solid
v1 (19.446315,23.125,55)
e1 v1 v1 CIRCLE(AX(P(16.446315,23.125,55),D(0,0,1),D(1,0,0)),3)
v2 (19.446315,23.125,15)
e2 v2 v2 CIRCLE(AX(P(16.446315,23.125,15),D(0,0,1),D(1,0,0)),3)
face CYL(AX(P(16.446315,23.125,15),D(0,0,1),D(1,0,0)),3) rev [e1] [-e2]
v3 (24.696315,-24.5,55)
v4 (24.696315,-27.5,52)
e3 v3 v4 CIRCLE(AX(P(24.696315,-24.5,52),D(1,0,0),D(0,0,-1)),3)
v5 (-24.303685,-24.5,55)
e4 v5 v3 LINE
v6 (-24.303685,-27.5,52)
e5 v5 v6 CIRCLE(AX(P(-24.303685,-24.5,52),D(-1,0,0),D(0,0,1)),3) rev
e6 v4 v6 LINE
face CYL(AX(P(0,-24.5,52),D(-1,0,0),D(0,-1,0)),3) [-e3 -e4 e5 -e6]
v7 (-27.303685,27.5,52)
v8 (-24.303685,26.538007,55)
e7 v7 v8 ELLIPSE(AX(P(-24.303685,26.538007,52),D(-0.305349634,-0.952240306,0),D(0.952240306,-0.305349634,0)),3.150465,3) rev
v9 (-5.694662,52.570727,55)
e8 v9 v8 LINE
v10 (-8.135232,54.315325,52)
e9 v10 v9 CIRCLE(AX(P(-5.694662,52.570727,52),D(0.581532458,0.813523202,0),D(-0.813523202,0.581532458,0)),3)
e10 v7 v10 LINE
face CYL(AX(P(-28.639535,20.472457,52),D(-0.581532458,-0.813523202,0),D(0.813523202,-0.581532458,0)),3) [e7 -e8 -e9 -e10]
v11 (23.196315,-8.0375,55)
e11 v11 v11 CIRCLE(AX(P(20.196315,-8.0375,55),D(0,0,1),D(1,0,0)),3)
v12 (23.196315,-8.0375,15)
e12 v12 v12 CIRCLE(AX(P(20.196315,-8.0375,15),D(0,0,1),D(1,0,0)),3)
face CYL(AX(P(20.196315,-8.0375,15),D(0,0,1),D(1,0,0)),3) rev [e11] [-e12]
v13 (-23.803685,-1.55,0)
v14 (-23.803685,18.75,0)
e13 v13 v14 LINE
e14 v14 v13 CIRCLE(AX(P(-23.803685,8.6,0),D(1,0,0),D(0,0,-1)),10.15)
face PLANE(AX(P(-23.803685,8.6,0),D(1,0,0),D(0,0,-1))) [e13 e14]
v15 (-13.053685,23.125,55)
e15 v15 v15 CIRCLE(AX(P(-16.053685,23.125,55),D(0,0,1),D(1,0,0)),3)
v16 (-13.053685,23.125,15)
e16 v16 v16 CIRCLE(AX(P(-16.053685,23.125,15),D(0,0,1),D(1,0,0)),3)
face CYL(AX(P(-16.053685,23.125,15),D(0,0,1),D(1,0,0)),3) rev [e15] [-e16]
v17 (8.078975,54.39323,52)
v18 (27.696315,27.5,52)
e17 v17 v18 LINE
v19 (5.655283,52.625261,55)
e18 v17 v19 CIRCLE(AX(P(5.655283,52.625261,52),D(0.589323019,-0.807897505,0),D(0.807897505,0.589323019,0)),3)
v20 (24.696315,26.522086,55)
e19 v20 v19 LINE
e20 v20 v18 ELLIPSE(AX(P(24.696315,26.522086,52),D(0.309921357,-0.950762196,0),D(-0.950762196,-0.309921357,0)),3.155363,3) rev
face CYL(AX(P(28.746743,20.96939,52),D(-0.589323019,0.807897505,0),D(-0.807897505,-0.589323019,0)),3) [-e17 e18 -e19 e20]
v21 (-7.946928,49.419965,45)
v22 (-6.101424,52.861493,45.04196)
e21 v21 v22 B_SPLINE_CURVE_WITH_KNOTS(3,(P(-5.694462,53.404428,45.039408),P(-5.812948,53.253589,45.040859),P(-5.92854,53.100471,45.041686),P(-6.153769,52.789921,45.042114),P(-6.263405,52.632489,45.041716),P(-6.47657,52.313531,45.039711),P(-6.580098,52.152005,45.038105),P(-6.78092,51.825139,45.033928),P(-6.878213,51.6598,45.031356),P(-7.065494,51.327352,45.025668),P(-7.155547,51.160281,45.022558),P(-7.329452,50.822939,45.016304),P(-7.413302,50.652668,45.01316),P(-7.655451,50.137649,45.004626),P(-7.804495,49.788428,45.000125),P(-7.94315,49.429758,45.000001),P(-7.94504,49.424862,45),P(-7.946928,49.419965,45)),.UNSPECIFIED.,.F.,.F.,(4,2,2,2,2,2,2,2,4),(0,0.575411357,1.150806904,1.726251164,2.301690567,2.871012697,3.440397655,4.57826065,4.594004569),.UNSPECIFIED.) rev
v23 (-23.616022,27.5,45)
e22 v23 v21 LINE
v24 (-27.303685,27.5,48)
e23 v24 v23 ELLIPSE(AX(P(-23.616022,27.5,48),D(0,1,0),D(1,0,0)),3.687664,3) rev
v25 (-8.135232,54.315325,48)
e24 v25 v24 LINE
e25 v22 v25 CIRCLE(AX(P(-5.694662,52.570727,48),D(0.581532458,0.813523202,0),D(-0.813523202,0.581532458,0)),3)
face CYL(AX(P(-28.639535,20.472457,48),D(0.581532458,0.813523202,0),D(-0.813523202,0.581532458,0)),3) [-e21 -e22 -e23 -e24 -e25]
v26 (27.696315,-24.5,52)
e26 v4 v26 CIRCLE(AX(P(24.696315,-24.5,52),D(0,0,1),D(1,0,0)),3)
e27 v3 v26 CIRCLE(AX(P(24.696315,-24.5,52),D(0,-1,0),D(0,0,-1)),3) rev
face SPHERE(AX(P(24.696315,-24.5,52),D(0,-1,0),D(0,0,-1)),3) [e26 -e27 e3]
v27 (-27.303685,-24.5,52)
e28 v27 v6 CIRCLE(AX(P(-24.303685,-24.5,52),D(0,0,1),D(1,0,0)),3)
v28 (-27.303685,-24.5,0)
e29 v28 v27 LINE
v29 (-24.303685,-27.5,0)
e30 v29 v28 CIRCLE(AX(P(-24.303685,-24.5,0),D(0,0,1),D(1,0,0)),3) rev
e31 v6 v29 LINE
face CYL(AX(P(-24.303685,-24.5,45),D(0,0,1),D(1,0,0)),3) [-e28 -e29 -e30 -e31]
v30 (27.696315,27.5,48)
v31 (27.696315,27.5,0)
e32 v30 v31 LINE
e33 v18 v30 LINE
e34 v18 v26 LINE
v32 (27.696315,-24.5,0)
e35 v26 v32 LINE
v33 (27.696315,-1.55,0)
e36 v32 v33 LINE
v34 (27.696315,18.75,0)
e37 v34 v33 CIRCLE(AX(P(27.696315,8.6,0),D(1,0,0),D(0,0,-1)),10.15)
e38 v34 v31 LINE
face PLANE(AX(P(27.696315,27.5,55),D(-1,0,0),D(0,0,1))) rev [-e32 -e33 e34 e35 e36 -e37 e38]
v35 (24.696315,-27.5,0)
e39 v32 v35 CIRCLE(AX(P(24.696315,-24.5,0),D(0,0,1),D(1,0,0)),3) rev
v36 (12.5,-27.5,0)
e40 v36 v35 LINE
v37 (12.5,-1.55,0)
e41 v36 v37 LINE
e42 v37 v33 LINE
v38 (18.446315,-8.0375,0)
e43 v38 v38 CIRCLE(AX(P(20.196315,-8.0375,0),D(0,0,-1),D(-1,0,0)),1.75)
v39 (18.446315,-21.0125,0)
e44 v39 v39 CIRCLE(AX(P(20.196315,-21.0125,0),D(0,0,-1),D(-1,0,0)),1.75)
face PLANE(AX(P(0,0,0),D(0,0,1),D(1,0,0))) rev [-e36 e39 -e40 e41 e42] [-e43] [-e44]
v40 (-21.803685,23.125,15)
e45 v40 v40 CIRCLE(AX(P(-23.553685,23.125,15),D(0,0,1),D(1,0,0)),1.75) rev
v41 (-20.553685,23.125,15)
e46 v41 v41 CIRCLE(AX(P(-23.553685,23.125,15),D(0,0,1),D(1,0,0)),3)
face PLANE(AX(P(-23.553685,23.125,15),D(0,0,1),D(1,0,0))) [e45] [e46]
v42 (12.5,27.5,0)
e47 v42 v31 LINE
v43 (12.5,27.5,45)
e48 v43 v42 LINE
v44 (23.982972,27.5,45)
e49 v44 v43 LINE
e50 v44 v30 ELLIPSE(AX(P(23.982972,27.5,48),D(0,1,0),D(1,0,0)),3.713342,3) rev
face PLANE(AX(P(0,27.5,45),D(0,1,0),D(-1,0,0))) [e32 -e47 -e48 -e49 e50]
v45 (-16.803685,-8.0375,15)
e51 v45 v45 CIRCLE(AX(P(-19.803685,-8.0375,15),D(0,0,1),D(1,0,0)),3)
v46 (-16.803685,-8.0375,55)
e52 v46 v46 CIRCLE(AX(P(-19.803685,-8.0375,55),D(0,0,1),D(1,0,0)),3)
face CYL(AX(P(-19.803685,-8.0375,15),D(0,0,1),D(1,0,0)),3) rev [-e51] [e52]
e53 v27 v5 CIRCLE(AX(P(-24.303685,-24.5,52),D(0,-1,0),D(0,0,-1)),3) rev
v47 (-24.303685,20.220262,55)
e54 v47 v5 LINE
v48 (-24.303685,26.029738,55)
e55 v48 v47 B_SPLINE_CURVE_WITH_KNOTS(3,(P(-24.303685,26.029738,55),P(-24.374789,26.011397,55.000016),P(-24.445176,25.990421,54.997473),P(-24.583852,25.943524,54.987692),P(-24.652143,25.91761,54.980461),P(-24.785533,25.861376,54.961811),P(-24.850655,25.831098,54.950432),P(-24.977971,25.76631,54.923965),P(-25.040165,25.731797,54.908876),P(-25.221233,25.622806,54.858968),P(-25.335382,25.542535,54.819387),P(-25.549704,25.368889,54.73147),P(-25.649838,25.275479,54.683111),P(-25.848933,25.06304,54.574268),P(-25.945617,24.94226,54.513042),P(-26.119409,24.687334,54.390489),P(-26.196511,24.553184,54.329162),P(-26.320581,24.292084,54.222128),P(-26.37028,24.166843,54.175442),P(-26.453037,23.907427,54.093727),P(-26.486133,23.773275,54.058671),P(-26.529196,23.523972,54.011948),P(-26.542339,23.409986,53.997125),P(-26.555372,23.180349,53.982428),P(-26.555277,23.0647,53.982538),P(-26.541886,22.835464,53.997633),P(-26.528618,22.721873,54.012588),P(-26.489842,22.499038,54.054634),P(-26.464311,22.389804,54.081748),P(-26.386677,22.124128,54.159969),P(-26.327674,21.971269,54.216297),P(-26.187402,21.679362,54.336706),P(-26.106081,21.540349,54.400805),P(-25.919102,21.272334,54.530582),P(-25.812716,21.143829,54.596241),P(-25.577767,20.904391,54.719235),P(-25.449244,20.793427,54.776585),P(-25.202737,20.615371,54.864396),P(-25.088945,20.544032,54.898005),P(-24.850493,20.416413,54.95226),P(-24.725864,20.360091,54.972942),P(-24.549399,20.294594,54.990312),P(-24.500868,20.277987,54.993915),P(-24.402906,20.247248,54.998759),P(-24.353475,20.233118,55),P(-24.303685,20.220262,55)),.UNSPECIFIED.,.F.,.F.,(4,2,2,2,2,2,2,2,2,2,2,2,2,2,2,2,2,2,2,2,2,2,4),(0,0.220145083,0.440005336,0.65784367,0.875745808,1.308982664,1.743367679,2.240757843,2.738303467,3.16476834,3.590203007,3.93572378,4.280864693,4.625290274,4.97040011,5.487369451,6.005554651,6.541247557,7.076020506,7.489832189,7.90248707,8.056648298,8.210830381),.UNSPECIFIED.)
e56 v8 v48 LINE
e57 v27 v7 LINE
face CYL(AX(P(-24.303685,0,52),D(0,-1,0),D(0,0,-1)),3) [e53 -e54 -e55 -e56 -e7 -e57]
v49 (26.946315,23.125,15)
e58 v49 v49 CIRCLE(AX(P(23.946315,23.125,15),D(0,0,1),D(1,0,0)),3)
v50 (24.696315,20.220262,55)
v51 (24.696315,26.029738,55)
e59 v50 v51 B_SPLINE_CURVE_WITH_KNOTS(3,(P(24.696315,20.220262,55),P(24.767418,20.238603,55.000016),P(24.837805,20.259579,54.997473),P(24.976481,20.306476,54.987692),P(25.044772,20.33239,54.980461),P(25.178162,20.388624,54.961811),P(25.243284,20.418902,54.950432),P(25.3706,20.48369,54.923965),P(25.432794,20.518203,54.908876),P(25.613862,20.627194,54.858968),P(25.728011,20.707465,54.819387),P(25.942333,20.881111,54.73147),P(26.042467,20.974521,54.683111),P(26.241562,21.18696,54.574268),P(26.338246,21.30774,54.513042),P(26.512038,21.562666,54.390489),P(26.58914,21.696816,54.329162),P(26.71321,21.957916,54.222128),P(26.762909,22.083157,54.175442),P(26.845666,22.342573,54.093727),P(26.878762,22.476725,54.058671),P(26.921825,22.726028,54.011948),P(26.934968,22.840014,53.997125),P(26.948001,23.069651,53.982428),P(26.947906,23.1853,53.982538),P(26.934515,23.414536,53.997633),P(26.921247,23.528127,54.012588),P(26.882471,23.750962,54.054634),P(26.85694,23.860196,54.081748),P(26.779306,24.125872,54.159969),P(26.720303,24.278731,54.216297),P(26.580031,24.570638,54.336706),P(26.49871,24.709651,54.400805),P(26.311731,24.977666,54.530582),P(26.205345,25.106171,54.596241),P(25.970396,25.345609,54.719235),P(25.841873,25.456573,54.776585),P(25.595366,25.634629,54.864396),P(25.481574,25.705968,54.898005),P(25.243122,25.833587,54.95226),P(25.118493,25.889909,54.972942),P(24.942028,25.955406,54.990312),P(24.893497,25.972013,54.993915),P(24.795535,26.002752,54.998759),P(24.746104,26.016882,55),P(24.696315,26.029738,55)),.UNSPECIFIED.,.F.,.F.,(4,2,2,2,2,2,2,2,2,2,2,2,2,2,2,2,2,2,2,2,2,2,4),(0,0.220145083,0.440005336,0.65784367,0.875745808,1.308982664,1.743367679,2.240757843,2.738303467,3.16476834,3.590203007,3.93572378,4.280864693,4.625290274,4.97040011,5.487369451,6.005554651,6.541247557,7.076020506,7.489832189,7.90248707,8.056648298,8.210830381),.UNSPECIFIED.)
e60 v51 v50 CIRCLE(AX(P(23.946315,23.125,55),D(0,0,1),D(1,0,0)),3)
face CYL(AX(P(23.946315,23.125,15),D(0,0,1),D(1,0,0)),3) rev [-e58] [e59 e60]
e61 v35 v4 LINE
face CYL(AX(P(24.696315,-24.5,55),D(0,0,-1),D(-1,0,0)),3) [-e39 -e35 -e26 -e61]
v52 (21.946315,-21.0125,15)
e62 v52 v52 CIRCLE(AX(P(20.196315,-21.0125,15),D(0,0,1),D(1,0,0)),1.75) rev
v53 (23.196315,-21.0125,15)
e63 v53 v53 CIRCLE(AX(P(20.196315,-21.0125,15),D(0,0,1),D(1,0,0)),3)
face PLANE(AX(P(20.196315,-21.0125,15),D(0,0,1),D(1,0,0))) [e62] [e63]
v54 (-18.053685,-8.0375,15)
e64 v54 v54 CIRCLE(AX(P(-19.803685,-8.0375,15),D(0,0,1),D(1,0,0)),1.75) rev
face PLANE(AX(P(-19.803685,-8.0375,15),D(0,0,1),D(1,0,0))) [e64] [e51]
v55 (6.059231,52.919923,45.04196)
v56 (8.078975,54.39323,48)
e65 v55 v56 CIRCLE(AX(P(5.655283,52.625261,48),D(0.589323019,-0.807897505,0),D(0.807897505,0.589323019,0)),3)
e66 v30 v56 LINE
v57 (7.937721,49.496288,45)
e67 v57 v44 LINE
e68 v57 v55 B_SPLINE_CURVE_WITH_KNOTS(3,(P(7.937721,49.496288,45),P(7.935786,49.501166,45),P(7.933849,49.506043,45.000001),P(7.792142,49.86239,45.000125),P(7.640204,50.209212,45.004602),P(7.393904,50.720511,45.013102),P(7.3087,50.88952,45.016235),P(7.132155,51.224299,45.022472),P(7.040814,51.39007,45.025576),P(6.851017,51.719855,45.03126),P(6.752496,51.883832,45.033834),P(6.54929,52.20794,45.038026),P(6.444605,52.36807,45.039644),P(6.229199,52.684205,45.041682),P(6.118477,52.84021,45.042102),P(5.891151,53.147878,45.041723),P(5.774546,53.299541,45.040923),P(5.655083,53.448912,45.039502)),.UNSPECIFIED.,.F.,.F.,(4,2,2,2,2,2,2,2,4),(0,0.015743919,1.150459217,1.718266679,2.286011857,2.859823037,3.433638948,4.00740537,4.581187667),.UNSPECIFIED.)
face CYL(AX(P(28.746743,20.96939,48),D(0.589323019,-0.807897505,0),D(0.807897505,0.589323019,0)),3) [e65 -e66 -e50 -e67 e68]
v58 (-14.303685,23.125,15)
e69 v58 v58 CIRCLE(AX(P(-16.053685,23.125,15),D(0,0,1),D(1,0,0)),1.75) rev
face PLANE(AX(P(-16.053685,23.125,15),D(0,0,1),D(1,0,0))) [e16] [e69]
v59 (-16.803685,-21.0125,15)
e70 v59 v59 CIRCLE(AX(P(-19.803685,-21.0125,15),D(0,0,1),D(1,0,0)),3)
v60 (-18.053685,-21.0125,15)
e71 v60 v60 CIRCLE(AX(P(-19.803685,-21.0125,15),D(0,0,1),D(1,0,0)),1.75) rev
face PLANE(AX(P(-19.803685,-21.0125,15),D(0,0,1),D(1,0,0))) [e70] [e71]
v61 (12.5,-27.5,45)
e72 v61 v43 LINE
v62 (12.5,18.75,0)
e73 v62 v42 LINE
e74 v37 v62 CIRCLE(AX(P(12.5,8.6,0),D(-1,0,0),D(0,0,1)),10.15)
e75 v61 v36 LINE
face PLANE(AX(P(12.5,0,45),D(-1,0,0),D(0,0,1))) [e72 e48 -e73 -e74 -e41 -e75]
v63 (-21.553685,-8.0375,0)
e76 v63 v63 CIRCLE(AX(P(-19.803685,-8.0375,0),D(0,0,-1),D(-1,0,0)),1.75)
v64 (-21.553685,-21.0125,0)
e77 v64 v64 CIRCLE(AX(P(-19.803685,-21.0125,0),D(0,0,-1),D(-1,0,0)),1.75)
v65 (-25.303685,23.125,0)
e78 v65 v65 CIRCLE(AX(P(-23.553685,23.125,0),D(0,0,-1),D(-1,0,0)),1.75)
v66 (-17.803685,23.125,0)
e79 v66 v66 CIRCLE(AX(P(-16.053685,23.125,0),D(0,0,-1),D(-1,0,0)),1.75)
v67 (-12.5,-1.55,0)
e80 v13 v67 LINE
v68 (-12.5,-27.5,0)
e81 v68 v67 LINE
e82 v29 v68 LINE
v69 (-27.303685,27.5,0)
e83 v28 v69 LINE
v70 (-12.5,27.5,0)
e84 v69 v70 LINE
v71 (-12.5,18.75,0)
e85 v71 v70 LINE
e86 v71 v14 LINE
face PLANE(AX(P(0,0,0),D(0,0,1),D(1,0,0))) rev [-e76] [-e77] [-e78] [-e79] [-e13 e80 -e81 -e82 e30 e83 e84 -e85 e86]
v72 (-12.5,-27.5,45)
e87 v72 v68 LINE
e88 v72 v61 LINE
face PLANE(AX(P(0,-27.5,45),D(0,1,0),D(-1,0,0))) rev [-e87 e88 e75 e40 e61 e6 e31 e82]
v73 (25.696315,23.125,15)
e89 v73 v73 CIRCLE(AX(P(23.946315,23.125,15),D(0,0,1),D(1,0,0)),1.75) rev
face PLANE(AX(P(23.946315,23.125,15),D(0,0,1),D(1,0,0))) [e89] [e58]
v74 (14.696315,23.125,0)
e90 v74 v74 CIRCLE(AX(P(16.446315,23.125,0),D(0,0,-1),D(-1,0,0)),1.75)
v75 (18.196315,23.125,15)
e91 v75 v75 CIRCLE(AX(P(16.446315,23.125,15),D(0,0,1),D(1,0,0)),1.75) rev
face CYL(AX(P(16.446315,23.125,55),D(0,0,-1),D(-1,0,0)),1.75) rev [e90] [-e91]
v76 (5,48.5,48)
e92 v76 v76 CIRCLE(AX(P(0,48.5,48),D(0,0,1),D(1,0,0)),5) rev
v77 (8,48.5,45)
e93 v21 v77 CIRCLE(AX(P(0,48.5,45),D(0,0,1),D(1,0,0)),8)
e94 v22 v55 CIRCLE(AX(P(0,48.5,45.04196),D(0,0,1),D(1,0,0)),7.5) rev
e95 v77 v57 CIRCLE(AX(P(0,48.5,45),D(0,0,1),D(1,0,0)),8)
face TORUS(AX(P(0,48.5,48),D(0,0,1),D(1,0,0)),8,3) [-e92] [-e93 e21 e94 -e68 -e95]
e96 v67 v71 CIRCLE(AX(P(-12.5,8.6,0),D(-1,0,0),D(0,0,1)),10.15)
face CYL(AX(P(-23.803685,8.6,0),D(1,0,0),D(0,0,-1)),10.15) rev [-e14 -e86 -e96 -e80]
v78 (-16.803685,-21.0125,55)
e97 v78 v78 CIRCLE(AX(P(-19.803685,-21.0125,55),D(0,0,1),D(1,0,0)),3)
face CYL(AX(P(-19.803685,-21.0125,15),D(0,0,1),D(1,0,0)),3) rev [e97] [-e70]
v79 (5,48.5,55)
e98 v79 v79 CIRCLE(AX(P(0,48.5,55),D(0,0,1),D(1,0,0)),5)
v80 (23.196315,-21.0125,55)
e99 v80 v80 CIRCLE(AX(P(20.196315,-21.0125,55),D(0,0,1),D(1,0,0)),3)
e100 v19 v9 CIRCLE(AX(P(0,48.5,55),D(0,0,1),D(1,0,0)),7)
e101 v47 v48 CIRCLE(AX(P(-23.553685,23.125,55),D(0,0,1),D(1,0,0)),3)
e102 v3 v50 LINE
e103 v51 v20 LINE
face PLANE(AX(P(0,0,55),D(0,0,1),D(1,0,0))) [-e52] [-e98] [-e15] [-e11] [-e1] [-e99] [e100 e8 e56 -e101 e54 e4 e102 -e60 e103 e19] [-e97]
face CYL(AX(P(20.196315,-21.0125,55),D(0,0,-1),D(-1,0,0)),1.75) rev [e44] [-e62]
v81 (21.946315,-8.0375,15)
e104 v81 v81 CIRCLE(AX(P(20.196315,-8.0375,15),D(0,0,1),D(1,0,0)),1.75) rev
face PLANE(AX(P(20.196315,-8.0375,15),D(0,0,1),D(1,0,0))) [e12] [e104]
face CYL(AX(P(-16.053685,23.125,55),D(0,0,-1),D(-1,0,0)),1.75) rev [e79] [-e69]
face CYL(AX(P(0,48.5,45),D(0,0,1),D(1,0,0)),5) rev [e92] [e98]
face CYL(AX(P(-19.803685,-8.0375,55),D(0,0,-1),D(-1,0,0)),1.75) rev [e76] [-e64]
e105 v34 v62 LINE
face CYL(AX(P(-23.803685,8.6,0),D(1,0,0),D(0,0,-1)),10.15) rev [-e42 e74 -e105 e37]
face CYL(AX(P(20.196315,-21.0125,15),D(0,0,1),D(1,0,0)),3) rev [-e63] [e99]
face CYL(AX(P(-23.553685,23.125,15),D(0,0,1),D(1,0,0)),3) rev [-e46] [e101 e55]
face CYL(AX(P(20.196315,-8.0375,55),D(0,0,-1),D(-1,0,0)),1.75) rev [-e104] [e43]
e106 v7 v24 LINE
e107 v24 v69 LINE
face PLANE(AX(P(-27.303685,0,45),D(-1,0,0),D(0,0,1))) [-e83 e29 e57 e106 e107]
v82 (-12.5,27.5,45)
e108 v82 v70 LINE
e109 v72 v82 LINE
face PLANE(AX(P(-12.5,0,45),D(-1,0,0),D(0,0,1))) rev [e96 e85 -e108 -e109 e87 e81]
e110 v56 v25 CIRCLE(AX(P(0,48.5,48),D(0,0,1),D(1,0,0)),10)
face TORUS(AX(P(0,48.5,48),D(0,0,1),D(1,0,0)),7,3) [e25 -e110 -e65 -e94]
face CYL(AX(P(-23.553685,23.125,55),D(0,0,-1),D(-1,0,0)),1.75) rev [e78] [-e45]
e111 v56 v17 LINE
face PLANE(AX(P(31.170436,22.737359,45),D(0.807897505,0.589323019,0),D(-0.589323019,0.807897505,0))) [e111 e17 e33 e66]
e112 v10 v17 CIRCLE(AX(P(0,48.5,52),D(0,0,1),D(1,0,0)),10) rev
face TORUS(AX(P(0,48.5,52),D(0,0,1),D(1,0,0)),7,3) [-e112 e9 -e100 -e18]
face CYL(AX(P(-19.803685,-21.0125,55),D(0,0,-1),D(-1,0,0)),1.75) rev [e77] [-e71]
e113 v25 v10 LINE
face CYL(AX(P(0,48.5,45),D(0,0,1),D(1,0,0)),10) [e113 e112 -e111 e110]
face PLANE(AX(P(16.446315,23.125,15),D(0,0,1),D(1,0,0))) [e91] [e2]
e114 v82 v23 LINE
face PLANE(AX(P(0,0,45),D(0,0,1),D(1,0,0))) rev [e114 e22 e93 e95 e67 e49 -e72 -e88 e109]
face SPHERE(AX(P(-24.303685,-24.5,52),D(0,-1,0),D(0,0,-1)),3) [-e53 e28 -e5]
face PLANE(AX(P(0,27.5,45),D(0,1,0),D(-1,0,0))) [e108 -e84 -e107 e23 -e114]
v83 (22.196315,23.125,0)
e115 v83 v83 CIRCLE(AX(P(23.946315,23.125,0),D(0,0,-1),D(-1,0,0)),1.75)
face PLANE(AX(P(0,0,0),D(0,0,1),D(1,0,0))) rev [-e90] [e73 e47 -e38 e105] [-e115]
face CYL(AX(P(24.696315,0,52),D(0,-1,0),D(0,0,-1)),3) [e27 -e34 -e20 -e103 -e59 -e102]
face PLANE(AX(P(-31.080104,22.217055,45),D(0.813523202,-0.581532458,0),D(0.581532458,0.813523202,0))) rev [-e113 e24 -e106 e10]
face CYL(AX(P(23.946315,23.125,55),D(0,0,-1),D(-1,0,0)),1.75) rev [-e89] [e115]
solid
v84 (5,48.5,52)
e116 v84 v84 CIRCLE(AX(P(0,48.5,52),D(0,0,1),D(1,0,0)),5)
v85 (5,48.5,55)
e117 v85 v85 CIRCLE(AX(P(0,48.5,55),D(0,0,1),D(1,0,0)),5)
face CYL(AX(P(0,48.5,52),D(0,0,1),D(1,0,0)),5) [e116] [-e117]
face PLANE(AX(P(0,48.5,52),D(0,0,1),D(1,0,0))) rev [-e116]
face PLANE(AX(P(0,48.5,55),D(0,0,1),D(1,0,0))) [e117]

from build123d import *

# Parameters (mm, degrees)
SKETCH1_W             = 55
SKETCH1_H             = 14.803685478
BOSS_EXTRUDE1_DEPTH   = 45
SKETCH1_H_2           = 15.196314522
BOSS_EXTRUDE1_2_DEPTH = 45
SKETCH2_W             = 55
SKETCH2_H             = 55
BOSS_EXTRUDE2_DEPTH   = 10
SKETCH3_R             = 5
BOSS_EXTRUDE3_DEPTH   = 10
SKETCH4_R             = 5
BOSS_EXTRUDE4_DEPTH   = 3
SKETCH5_R             = 10.15
CUT_EXTRUDE1_DEPTH    = 51.5
SKETCH8_R             = 1.75
CUT_EXTRUDE3_DEPTH    = 85.937246471
SKETCH9_R             = 3
CUT_EXTRUDE4_DEPTH    = 40
FILLET2_R             = 3


with BuildPart() as part:
    # Sketch1 → Boss-Extrude1 (new body)
    with BuildSketch(Plane(origin=(0, 0, 0), x_dir=(0, 1, 0), z_dir=(0, 0, 1))):
        with Locations((0, 19.901842739)):
            Rectangle(SKETCH1_W, SKETCH1_H)
    extrude(amount=BOSS_EXTRUDE1_DEPTH)



with BuildPart() as body_2:
    # Sketch1 → Boss-Extrude1 2 (new body)
    with BuildSketch(Plane(origin=(0, 0, 0), x_dir=(0, 1, 0), z_dir=(0, 0, 1))):
        with Locations((0, -20.098157261)):
            Rectangle(SKETCH1_W, SKETCH1_H_2)
    extrude(amount=BOSS_EXTRUDE1_2_DEPTH)


with BuildPart() as part_1:
    add(part.part)

    add(body_2.part)  # Boss-Extrude2 merges body 2
    # Sketch2 → Boss-Extrude2 (add)
    with BuildSketch(Plane.XY.offset(45)):
        with Locations((0.196314522, 0)):
            Rectangle(SKETCH2_W, SKETCH2_H)
    extrude(amount=BOSS_EXTRUDE2_DEPTH)

    # Sketch3 → Boss-Extrude3 (add)
    with BuildSketch(Plane.XY.offset(55)):
        with BuildLine():
            ThreePointArc((8.078975052, 54.393230193), (-0.04804719, 58.499884573), (-8.135232017, 54.315324585))
            Line((-8.135232017, 54.315324585), (-27.303685478, 27.5))
            Line((-27.303685478, 27.5), (27.696314522, 27.5))
            Line((27.696314522, 27.5), (8.078975052, 54.393230193))
        make_face()
        with Locations((0, 48.5)):
            Circle(SKETCH3_R, mode=Mode.SUBTRACT)
    extrude(amount=-BOSS_EXTRUDE3_DEPTH)

    # Sketch5 → Cut-Extrude1 (cut)
    with BuildSketch(Plane.YZ.offset(27.696314522)):
        with Locations((8.6, 0)):
            Circle(SKETCH5_R)
    extrude(amount=-CUT_EXTRUDE1_DEPTH, mode=Mode.SUBTRACT)

    # Sketch8 → Cut-Extrude3 (cut, through all)
    with BuildSketch(Plane(origin=(0, 0, 0), x_dir=(1, 0, 0), z_dir=(0, 0, -1))):
        with Locations(Location((20.196314522, 21.0125, 0), (0, 0, 180))):
            Circle(SKETCH8_R)
        with Locations(Location((20.196314522, 8.0375, 0), (0, 0, 180))):
            Circle(SKETCH8_R)
        with Locations(Location((23.946314522, -23.125, 0), (0, 0, 180))):
            Circle(SKETCH8_R)
        with Locations(Location((16.446314522, -23.125, 0), (0, 0, 180))):
            Circle(SKETCH8_R)
        with Locations(Location((-16.053685478, -23.125, 0), (0, 0, 180))):
            Circle(SKETCH8_R)
        with Locations(Location((-23.553685478, -23.125, 0), (0, 0, 180))):
            Circle(SKETCH8_R)
        with Locations(Location((-19.803685478, 8.0375, 0), (0, 0, 180))):
            Circle(SKETCH8_R)
        with Locations(Location((-19.803685478, 21.0125, 0), (0, 0, 180))):
            Circle(SKETCH8_R)
    extrude(amount=-CUT_EXTRUDE3_DEPTH, mode=Mode.SUBTRACT)

    # Sketch9 → Cut-Extrude4 (cut)
    with BuildSketch(Plane.XY.offset(55)):
        with Locations((23.946314522, 23.125)):
            Circle(SKETCH9_R)
        with Locations((16.446314522, 23.125)):
            Circle(SKETCH9_R)
        with Locations((20.196314522, -8.0375)):
            Circle(SKETCH9_R)
        with Locations((20.196314522, -21.0125)):
            Circle(SKETCH9_R)
        with Locations((-16.053685478, 23.125)):
            Circle(SKETCH9_R)
        with Locations((-23.553685478, 23.125)):
            Circle(SKETCH9_R)
        with Locations((-19.803685478, -8.0375)):
            Circle(SKETCH9_R)
        with Locations((-19.803685478, -21.0125)):
            Circle(SKETCH9_R)
    extrude(amount=-CUT_EXTRUDE4_DEPTH, mode=Mode.SUBTRACT)

    # Fillet2
    # the kernel refuses this fillet: 3 mm, written as the material it takes off along each edge
    with BuildSketch(Plane(origin=(24.696314522, -24.5, 52), x_dir=(1, 0, 0), z_dir=(0, 0, 1))) as fillet2_piece_1_section:
        Polygon((0, 0), (FILLET2_R * 1.02, 0), (FILLET2_R * 1.02, -FILLET2_R * 1.02), (0, -FILLET2_R * 1.02), align=None)
    fillet2_piece_1 = extrude(amount=FILLET2_R * 1.02, mode=Mode.PRIVATE)
    fillet2_piece_1 = fillet2_piece_1 - Plane(origin=(24.696314522, -24.5, 52), x_dir=(-0.7071067811865477, 0.7071067811865475, 0), z_dir=(0, 0, 1)) * Sphere(FILLET2_R, mode=Mode.PRIVATE)
    add(fillet2_piece_1, mode=Mode.SUBTRACT)
    with BuildSketch(Plane(origin=(-24.303685478, -24.5, 52), x_dir=(0, -1, 0), z_dir=(0, 0, 1))) as fillet2_piece_2_section:
        Polygon((0, 0), (FILLET2_R * 1.02, 0), (FILLET2_R * 1.02, -FILLET2_R * 1.02), (0, -FILLET2_R * 1.02), align=None)
    fillet2_piece_2 = extrude(amount=FILLET2_R * 1.02, mode=Mode.PRIVATE)
    fillet2_piece_2 = fillet2_piece_2 - Plane(origin=(-24.303685478, -24.5, 52), x_dir=(0.7071067811865475, 0.7071067811865476, 0), z_dir=(0, 0, 1)) * Sphere(FILLET2_R, mode=Mode.PRIVATE)
    add(fillet2_piece_2, mode=Mode.SUBTRACT)
    with BuildSketch(Plane(origin=(27.696314522, -27.5, 0), x_dir=(-1, 0, 0), z_dir=(0, 0, 1)), Plane(origin=(-27.303685478, -27.5, 52), x_dir=(1, 0, 0), z_dir=(0, 0, -1))) as fillet2_piece_3:
        with BuildLine():
            CenterArc((FILLET2_R, -FILLET2_R), FILLET2_R, 90, 90)
            Line((0, -FILLET2_R), (-FILLET2_R * 0.02, -FILLET2_R))
            Line((-FILLET2_R * 0.02, -FILLET2_R), (-FILLET2_R * 0.02, FILLET2_R * 0.02))
            Line((-FILLET2_R * 0.02, FILLET2_R * 0.02), (FILLET2_R, FILLET2_R * 0.02))
            Line((FILLET2_R, FILLET2_R * 0.02), (FILLET2_R, 0))
        make_face()
    extrude(amount=52, mode=Mode.SUBTRACT)
    with BuildSketch(Plane(origin=(-27.303685478, -24.5, 55), x_dir=(0, 0, -1), z_dir=(0, 1, 0))) as fillet2_piece_4_section:
        with BuildLine():
            CenterArc((FILLET2_R, -FILLET2_R), FILLET2_R, 90, 90)
            Line((0, -FILLET2_R), (-FILLET2_R * 0.02, -FILLET2_R))
            Line((-FILLET2_R * 0.02, -FILLET2_R), (-FILLET2_R * 0.02, FILLET2_R * 0.02))
            Line((-FILLET2_R * 0.02, FILLET2_R * 0.02), (FILLET2_R, FILLET2_R * 0.02))
            Line((FILLET2_R, FILLET2_R * 0.02), (FILLET2_R, 0))
        make_face()
    fillet2_piece_4 = extrude(amount=59.5, mode=Mode.PRIVATE)
    fillet2_piece_4 = split(fillet2_piece_4, bisect_by=Plane(origin=(-39.142199002, 10.938748286, 54.327343255), z_dir=(0.8135232017068688, -0.5815324584961749, 0)), keep=Keep.TOP, mode=Mode.PRIVATE)
    add(fillet2_piece_4, mode=Mode.SUBTRACT)
    with BuildSketch(Plane(origin=(24.696314522, -27.5, 55), x_dir=(0, 0, -1), z_dir=(-1, 0, 0))) as fillet2_piece_5:
        with BuildLine():
            CenterArc((FILLET2_R, -FILLET2_R), FILLET2_R, 90, 90)
            Line((0, -FILLET2_R), (-FILLET2_R * 0.02, -FILLET2_R))
            Line((-FILLET2_R * 0.02, -FILLET2_R), (-FILLET2_R * 0.02, FILLET2_R * 0.02))
            Line((-FILLET2_R * 0.02, FILLET2_R * 0.02), (FILLET2_R, FILLET2_R * 0.02))
            Line((FILLET2_R, FILLET2_R * 0.02), (FILLET2_R, 0))
        make_face()
    extrude(amount=49, mode=Mode.SUBTRACT)
    with BuildSketch(Plane(origin=(27.696314522, 35, 55), x_dir=(-1, 0, 0), z_dir=(0, -1, 0))) as fillet2_piece_6_section:
        with BuildLine():
            CenterArc((FILLET2_R, FILLET2_R), FILLET2_R, 180, 90)
            Line((0, FILLET2_R), (-FILLET2_R * 0.02, FILLET2_R))
            Line((-FILLET2_R * 0.02, FILLET2_R), (-FILLET2_R * 0.02, -FILLET2_R * 0.02))
            Line((-FILLET2_R * 0.02, -FILLET2_R * 0.02), (FILLET2_R, -FILLET2_R * 0.02))
            Line((FILLET2_R, -FILLET2_R * 0.02), (FILLET2_R, 0))
        make_face()
    fillet2_piece_6 = extrude(amount=59.5, mode=Mode.PRIVATE)
    fillet2_piece_6 = split(fillet2_piece_6, bisect_by=Plane(origin=(39.610410285, 11.167075732, 54.327214702), z_dir=(-0.8078975051993711, -0.5893230193133748, 0)), keep=Keep.TOP, mode=Mode.PRIVATE)
    add(fillet2_piece_6, mode=Mode.SUBTRACT)
    with BuildSketch(Plane(origin=(32.116237167, 21.440768711, 45), x_dir=(-0.807897505199371, -0.5893230193133747, 0), z_dir=(-0.5893230193133748, 0.8078975051993711, 0))) as fillet2_piece_7_section:
        with BuildLine():
            CenterArc((FILLET2_R, FILLET2_R), FILLET2_R, 180, 90)
            Line((0, FILLET2_R), (-FILLET2_R * 0.02, FILLET2_R))
            Line((-FILLET2_R * 0.02, FILLET2_R), (-FILLET2_R * 0.02, -FILLET2_R * 0.02))
            Line((-FILLET2_R * 0.02, -FILLET2_R * 0.02), (FILLET2_R, -FILLET2_R * 0.02))
            Line((FILLET2_R, -FILLET2_R * 0.02), (FILLET2_R, 0))
        make_face()
    fillet2_piece_7 = extrude(amount=40.787923307, mode=Mode.PRIVATE)
    fillet2_piece_7 = split(fillet2_piece_7, bisect_by=Plane(origin=(17.200847448, 27.5, 45.684561455), z_dir=(0, 1, 0)), keep=Keep.TOP, mode=Mode.PRIVATE)
    fillet2_piece_7 = split(fillet2_piece_7, bisect_by=Plane(origin=(27.696314522, 40.751258777, 45.684561455), z_dir=(-1, 0, 0)), keep=Keep.TOP, mode=Mode.PRIVATE)
    add(fillet2_piece_7, mode=Mode.SUBTRACT)
    with BuildSketch(Plane(origin=(-8.135232017, 54.315324585, 55), x_dir=(0, 0, -1), z_dir=(-0.5815324584961749, -0.8135232017068688, 0))) as fillet2_piece_8_section:
        with BuildLine():
            CenterArc((FILLET2_R, FILLET2_R), FILLET2_R, 180, 90)
            Line((0, FILLET2_R), (-FILLET2_R * 0.02, FILLET2_R))
            Line((-FILLET2_R * 0.02, FILLET2_R), (-FILLET2_R * 0.02, -FILLET2_R * 0.02))
            Line((-FILLET2_R * 0.02, -FILLET2_R * 0.02), (FILLET2_R, -FILLET2_R * 0.02))
            Line((FILLET2_R, -FILLET2_R * 0.02), (FILLET2_R, 0))
        make_face()
    fillet2_piece_8 = extrude(amount=40.461966578, mode=Mode.PRIVATE)
    fillet2_piece_8 = split(fillet2_piece_8, bisect_by=Plane(origin=(-27.303685478, 40.106363317, 54.331008368), z_dir=(1, 0, 0)), keep=Keep.TOP, mode=Mode.PRIVATE)
    add(fillet2_piece_8, mode=Mode.SUBTRACT)
    with BuildSketch(Plane(origin=(0, 48.5, 45), x_dir=(0.8078975051993723, 0.589323019313373, 0), z_dir=(0.589323019313373, -0.8078975051993723, 0))) as fillet2_piece_9:
        with BuildLine():
            CenterArc((10 - FILLET2_R, FILLET2_R), FILLET2_R, 270, 90)
            Line((10, FILLET2_R), (10 + FILLET2_R * 0.02, FILLET2_R))
            Line((10 + FILLET2_R * 0.02, FILLET2_R), (10 + FILLET2_R * 0.02, -FILLET2_R * 0.02))
            Line((10 + FILLET2_R * 0.02, -FILLET2_R * 0.02), (10 - FILLET2_R, -FILLET2_R * 0.02))
            Line((10 - FILLET2_R, -FILLET2_R * 0.02), (10 - FILLET2_R, 0))
        make_face()
    revolve(axis=Axis((0, 48.5, 45), (0, 0, 1)), revolution_arc=108.332617753, mode=Mode.SUBTRACT)
    with BuildSketch(Plane(origin=(-8.135232017, 54.315324585, 45), x_dir=(0.8135232017068688, -0.5815324584961749, 0), z_dir=(-0.5815324584961749, -0.8135232017068688, 0))) as fillet2_piece_10_section:
        with BuildLine():
            CenterArc((FILLET2_R, FILLET2_R), FILLET2_R, 180, 90)
            Line((0, FILLET2_R), (-FILLET2_R * 0.02, FILLET2_R))
            Line((-FILLET2_R * 0.02, FILLET2_R), (-FILLET2_R * 0.02, -FILLET2_R * 0.02))
            Line((-FILLET2_R * 0.02, -FILLET2_R * 0.02), (FILLET2_R, -FILLET2_R * 0.02))
            Line((FILLET2_R, -FILLET2_R * 0.02), (FILLET2_R, 0))
        make_face()
    fillet2_piece_10 = extrude(amount=40.461966578, mode=Mode.PRIVATE)
    fillet2_piece_10 = split(fillet2_piece_10, bisect_by=Plane(origin=(-17.033553268, 27.5, 45.684501735), z_dir=(0, 1, 0)), keep=Keep.TOP, mode=Mode.PRIVATE)
    fillet2_piece_10 = split(fillet2_piece_10, bisect_by=Plane(origin=(-27.303685478, 40.714914047, 45.684501735), z_dir=(1, 0, 0)), keep=Keep.TOP, mode=Mode.PRIVATE)
    add(fillet2_piece_10, mode=Mode.SUBTRACT)
    with BuildSketch(Plane(origin=(0, 48.5, 45), x_dir=(1, 0, 0), z_dir=(0, -1, 0))) as fillet2_piece_11:
        with BuildLine():
            CenterArc((5 + FILLET2_R, FILLET2_R), FILLET2_R, 180, 90)
            Line((5, FILLET2_R), (5 - FILLET2_R * 0.02, FILLET2_R))
            Line((5 - FILLET2_R * 0.02, FILLET2_R), (5 - FILLET2_R * 0.02, -FILLET2_R * 0.02))
            Line((5 - FILLET2_R * 0.02, -FILLET2_R * 0.02), (5 + FILLET2_R, -FILLET2_R * 0.02))
            Line((5 + FILLET2_R, -FILLET2_R * 0.02), (5 + FILLET2_R, 0))
        make_face()
    revolve(axis=Axis((0, 48.5, 45), (0, 0, 1)), mode=Mode.SUBTRACT)
    with BuildSketch(Plane(origin=(32.116237167, 21.440768711, 55), x_dir=(0, 0, -1), z_dir=(-0.5893230193133748, 0.8078975051993711, 0))) as fillet2_piece_12_section:
        with BuildLine():
            CenterArc((FILLET2_R, FILLET2_R), FILLET2_R, 180, 90)
            Line((0, FILLET2_R), (-FILLET2_R * 0.02, FILLET2_R))
            Line((-FILLET2_R * 0.02, FILLET2_R), (-FILLET2_R * 0.02, -FILLET2_R * 0.02))
            Line((-FILLET2_R * 0.02, -FILLET2_R * 0.02), (FILLET2_R, -FILLET2_R * 0.02))
            Line((FILLET2_R, -FILLET2_R * 0.02), (FILLET2_R, 0))
        make_face()
    fillet2_piece_12 = extrude(amount=40.787923307, mode=Mode.PRIVATE)
    fillet2_piece_12 = split(fillet2_piece_12, bisect_by=Plane(origin=(27.696314522, 40.151087801, 54.330714457), z_dir=(-1, 0, 0)), keep=Keep.TOP, mode=Mode.PRIVATE)
    add(fillet2_piece_12, mode=Mode.SUBTRACT)
    with BuildSketch(Plane(origin=(0, 48.5, 55), x_dir=(0.8078975051993723, 0.589323019313373, 0), z_dir=(0.589323019313373, -0.8078975051993723, 0))) as fillet2_piece_13:
        with BuildLine():
            CenterArc((10 - FILLET2_R, -FILLET2_R), FILLET2_R, 0, 90)
            Line((10 - FILLET2_R, 0), (10 - FILLET2_R, FILLET2_R * 0.02))
            Line((10 - FILLET2_R, FILLET2_R * 0.02), (10 + FILLET2_R * 0.02, FILLET2_R * 0.02))
            Line((10 + FILLET2_R * 0.02, FILLET2_R * 0.02), (10 + FILLET2_R * 0.02, -FILLET2_R))
            Line((10 + FILLET2_R * 0.02, -FILLET2_R), (10, -FILLET2_R))
        make_face()
    revolve(axis=Axis((0, 48.5, 55), (0, 0, 1)), revolution_arc=108.332617753, mode=Mode.SUBTRACT)
    with BuildSketch(Plane(origin=(-27.303685478, -24.5, 55), x_dir=(0, 0, -1), z_dir=(0, 1, 0))) as fillet2_piece_14a_section:
        with BuildLine():
            CenterArc((FILLET2_R, -FILLET2_R), FILLET2_R, 90, 90)
            Line((0, -FILLET2_R), (-FILLET2_R * 0.02, -FILLET2_R))
            Line((-FILLET2_R * 0.02, -FILLET2_R), (-FILLET2_R * 0.02, FILLET2_R * 0.02))
            Line((-FILLET2_R * 0.02, FILLET2_R * 0.02), (FILLET2_R, FILLET2_R * 0.02))
            Line((FILLET2_R, FILLET2_R * 0.02), (FILLET2_R, 0))
        make_face()
    fillet2_piece_14a = extrude(amount=59.5, mode=Mode.PRIVATE)
    fillet2_piece_14a = split(fillet2_piece_14a, bisect_by=Plane(origin=(-25.13493708, 30.533927195, 54.268036467), z_dir=(-0.8135232017068688, 0.5815324584961749, 0)), keep=Keep.TOP, mode=Mode.PRIVATE)
    with BuildSketch(Plane(origin=(-8.135232017, 54.315324585, 55), x_dir=(0, 0, -1), z_dir=(-0.5815324584961749, -0.8135232017068688, 0))) as fillet2_piece_14b_section:
        with BuildLine():
            CenterArc((FILLET2_R, FILLET2_R), FILLET2_R, 180, 90)
            Line((0, FILLET2_R), (-FILLET2_R * 0.02, FILLET2_R))
            Line((-FILLET2_R * 0.02, FILLET2_R), (-FILLET2_R * 0.02, -FILLET2_R * 0.02))
            Line((-FILLET2_R * 0.02, -FILLET2_R * 0.02), (FILLET2_R, -FILLET2_R * 0.02))
            Line((FILLET2_R, -FILLET2_R * 0.02), (FILLET2_R, 0))
        make_face()
    fillet2_piece_14b = extrude(amount=40.461966578, mode=Mode.PRIVATE)
    fillet2_piece_14b = split(fillet2_piece_14b, bisect_by=Plane(origin=(-27.303685478, 23.770632246, 54.268036467), z_dir=(-1, 0, 0)), keep=Keep.TOP, mode=Mode.PRIVATE)
    fillet2_piece_14 = fillet2_piece_14a & fillet2_piece_14b
    add(fillet2_piece_14, mode=Mode.SUBTRACT)
    with BuildSketch(Plane(origin=(32.116237167, 21.440768711, 55), x_dir=(0, 0, -1), z_dir=(-0.5893230193133748, 0.8078975051993711, 0))) as fillet2_piece_15a_section:
        with BuildLine():
            CenterArc((FILLET2_R, FILLET2_R), FILLET2_R, 180, 90)
            Line((0, FILLET2_R), (-FILLET2_R * 0.02, FILLET2_R))
            Line((-FILLET2_R * 0.02, FILLET2_R), (-FILLET2_R * 0.02, -FILLET2_R * 0.02))
            Line((-FILLET2_R * 0.02, -FILLET2_R * 0.02), (FILLET2_R, -FILLET2_R * 0.02))
            Line((FILLET2_R, -FILLET2_R * 0.02), (FILLET2_R, 0))
        make_face()
    fillet2_piece_15a = extrude(amount=40.787923307, mode=Mode.PRIVATE)
    fillet2_piece_15a = split(fillet2_piece_15a, bisect_by=Plane(origin=(27.696314522, 23.793798238, 54.269244258), z_dir=(1, 0, 0)), keep=Keep.TOP, mode=Mode.PRIVATE)
    with BuildSketch(Plane(origin=(27.696314522, 35, 55), x_dir=(-1, 0, 0), z_dir=(0, -1, 0))) as fillet2_piece_15b_section:
        with BuildLine():
            CenterArc((FILLET2_R, FILLET2_R), FILLET2_R, 180, 90)
            Line((0, FILLET2_R), (-FILLET2_R * 0.02, FILLET2_R))
            Line((-FILLET2_R * 0.02, FILLET2_R), (-FILLET2_R * 0.02, -FILLET2_R * 0.02))
            Line((-FILLET2_R * 0.02, -FILLET2_R * 0.02), (FILLET2_R, -FILLET2_R * 0.02))
            Line((FILLET2_R, -FILLET2_R * 0.02), (FILLET2_R, 0))
        make_face()
    fillet2_piece_15b = extrude(amount=59.5, mode=Mode.PRIVATE)
    fillet2_piece_15b = split(fillet2_piece_15b, bisect_by=Plane(origin=(25.512164509, 30.494231157, 54.269244258), z_dir=(0.8078975051993711, 0.5893230193133748, 0)), keep=Keep.TOP, mode=Mode.PRIVATE)
    fillet2_piece_15 = fillet2_piece_15a & fillet2_piece_15b
    add(fillet2_piece_15, mode=Mode.SUBTRACT)


with BuildPart() as body_2_2:
    # Sketch4 → Boss-Extrude4 (new body)
    with BuildSketch(Plane.XY.offset(55)):
        with Locations((0, 48.5)):
            Circle(SKETCH4_R)
    extrude(amount=-BOSS_EXTRUDE4_DEPTH)


solid = Compound([part_1.part, body_2_2.part])
